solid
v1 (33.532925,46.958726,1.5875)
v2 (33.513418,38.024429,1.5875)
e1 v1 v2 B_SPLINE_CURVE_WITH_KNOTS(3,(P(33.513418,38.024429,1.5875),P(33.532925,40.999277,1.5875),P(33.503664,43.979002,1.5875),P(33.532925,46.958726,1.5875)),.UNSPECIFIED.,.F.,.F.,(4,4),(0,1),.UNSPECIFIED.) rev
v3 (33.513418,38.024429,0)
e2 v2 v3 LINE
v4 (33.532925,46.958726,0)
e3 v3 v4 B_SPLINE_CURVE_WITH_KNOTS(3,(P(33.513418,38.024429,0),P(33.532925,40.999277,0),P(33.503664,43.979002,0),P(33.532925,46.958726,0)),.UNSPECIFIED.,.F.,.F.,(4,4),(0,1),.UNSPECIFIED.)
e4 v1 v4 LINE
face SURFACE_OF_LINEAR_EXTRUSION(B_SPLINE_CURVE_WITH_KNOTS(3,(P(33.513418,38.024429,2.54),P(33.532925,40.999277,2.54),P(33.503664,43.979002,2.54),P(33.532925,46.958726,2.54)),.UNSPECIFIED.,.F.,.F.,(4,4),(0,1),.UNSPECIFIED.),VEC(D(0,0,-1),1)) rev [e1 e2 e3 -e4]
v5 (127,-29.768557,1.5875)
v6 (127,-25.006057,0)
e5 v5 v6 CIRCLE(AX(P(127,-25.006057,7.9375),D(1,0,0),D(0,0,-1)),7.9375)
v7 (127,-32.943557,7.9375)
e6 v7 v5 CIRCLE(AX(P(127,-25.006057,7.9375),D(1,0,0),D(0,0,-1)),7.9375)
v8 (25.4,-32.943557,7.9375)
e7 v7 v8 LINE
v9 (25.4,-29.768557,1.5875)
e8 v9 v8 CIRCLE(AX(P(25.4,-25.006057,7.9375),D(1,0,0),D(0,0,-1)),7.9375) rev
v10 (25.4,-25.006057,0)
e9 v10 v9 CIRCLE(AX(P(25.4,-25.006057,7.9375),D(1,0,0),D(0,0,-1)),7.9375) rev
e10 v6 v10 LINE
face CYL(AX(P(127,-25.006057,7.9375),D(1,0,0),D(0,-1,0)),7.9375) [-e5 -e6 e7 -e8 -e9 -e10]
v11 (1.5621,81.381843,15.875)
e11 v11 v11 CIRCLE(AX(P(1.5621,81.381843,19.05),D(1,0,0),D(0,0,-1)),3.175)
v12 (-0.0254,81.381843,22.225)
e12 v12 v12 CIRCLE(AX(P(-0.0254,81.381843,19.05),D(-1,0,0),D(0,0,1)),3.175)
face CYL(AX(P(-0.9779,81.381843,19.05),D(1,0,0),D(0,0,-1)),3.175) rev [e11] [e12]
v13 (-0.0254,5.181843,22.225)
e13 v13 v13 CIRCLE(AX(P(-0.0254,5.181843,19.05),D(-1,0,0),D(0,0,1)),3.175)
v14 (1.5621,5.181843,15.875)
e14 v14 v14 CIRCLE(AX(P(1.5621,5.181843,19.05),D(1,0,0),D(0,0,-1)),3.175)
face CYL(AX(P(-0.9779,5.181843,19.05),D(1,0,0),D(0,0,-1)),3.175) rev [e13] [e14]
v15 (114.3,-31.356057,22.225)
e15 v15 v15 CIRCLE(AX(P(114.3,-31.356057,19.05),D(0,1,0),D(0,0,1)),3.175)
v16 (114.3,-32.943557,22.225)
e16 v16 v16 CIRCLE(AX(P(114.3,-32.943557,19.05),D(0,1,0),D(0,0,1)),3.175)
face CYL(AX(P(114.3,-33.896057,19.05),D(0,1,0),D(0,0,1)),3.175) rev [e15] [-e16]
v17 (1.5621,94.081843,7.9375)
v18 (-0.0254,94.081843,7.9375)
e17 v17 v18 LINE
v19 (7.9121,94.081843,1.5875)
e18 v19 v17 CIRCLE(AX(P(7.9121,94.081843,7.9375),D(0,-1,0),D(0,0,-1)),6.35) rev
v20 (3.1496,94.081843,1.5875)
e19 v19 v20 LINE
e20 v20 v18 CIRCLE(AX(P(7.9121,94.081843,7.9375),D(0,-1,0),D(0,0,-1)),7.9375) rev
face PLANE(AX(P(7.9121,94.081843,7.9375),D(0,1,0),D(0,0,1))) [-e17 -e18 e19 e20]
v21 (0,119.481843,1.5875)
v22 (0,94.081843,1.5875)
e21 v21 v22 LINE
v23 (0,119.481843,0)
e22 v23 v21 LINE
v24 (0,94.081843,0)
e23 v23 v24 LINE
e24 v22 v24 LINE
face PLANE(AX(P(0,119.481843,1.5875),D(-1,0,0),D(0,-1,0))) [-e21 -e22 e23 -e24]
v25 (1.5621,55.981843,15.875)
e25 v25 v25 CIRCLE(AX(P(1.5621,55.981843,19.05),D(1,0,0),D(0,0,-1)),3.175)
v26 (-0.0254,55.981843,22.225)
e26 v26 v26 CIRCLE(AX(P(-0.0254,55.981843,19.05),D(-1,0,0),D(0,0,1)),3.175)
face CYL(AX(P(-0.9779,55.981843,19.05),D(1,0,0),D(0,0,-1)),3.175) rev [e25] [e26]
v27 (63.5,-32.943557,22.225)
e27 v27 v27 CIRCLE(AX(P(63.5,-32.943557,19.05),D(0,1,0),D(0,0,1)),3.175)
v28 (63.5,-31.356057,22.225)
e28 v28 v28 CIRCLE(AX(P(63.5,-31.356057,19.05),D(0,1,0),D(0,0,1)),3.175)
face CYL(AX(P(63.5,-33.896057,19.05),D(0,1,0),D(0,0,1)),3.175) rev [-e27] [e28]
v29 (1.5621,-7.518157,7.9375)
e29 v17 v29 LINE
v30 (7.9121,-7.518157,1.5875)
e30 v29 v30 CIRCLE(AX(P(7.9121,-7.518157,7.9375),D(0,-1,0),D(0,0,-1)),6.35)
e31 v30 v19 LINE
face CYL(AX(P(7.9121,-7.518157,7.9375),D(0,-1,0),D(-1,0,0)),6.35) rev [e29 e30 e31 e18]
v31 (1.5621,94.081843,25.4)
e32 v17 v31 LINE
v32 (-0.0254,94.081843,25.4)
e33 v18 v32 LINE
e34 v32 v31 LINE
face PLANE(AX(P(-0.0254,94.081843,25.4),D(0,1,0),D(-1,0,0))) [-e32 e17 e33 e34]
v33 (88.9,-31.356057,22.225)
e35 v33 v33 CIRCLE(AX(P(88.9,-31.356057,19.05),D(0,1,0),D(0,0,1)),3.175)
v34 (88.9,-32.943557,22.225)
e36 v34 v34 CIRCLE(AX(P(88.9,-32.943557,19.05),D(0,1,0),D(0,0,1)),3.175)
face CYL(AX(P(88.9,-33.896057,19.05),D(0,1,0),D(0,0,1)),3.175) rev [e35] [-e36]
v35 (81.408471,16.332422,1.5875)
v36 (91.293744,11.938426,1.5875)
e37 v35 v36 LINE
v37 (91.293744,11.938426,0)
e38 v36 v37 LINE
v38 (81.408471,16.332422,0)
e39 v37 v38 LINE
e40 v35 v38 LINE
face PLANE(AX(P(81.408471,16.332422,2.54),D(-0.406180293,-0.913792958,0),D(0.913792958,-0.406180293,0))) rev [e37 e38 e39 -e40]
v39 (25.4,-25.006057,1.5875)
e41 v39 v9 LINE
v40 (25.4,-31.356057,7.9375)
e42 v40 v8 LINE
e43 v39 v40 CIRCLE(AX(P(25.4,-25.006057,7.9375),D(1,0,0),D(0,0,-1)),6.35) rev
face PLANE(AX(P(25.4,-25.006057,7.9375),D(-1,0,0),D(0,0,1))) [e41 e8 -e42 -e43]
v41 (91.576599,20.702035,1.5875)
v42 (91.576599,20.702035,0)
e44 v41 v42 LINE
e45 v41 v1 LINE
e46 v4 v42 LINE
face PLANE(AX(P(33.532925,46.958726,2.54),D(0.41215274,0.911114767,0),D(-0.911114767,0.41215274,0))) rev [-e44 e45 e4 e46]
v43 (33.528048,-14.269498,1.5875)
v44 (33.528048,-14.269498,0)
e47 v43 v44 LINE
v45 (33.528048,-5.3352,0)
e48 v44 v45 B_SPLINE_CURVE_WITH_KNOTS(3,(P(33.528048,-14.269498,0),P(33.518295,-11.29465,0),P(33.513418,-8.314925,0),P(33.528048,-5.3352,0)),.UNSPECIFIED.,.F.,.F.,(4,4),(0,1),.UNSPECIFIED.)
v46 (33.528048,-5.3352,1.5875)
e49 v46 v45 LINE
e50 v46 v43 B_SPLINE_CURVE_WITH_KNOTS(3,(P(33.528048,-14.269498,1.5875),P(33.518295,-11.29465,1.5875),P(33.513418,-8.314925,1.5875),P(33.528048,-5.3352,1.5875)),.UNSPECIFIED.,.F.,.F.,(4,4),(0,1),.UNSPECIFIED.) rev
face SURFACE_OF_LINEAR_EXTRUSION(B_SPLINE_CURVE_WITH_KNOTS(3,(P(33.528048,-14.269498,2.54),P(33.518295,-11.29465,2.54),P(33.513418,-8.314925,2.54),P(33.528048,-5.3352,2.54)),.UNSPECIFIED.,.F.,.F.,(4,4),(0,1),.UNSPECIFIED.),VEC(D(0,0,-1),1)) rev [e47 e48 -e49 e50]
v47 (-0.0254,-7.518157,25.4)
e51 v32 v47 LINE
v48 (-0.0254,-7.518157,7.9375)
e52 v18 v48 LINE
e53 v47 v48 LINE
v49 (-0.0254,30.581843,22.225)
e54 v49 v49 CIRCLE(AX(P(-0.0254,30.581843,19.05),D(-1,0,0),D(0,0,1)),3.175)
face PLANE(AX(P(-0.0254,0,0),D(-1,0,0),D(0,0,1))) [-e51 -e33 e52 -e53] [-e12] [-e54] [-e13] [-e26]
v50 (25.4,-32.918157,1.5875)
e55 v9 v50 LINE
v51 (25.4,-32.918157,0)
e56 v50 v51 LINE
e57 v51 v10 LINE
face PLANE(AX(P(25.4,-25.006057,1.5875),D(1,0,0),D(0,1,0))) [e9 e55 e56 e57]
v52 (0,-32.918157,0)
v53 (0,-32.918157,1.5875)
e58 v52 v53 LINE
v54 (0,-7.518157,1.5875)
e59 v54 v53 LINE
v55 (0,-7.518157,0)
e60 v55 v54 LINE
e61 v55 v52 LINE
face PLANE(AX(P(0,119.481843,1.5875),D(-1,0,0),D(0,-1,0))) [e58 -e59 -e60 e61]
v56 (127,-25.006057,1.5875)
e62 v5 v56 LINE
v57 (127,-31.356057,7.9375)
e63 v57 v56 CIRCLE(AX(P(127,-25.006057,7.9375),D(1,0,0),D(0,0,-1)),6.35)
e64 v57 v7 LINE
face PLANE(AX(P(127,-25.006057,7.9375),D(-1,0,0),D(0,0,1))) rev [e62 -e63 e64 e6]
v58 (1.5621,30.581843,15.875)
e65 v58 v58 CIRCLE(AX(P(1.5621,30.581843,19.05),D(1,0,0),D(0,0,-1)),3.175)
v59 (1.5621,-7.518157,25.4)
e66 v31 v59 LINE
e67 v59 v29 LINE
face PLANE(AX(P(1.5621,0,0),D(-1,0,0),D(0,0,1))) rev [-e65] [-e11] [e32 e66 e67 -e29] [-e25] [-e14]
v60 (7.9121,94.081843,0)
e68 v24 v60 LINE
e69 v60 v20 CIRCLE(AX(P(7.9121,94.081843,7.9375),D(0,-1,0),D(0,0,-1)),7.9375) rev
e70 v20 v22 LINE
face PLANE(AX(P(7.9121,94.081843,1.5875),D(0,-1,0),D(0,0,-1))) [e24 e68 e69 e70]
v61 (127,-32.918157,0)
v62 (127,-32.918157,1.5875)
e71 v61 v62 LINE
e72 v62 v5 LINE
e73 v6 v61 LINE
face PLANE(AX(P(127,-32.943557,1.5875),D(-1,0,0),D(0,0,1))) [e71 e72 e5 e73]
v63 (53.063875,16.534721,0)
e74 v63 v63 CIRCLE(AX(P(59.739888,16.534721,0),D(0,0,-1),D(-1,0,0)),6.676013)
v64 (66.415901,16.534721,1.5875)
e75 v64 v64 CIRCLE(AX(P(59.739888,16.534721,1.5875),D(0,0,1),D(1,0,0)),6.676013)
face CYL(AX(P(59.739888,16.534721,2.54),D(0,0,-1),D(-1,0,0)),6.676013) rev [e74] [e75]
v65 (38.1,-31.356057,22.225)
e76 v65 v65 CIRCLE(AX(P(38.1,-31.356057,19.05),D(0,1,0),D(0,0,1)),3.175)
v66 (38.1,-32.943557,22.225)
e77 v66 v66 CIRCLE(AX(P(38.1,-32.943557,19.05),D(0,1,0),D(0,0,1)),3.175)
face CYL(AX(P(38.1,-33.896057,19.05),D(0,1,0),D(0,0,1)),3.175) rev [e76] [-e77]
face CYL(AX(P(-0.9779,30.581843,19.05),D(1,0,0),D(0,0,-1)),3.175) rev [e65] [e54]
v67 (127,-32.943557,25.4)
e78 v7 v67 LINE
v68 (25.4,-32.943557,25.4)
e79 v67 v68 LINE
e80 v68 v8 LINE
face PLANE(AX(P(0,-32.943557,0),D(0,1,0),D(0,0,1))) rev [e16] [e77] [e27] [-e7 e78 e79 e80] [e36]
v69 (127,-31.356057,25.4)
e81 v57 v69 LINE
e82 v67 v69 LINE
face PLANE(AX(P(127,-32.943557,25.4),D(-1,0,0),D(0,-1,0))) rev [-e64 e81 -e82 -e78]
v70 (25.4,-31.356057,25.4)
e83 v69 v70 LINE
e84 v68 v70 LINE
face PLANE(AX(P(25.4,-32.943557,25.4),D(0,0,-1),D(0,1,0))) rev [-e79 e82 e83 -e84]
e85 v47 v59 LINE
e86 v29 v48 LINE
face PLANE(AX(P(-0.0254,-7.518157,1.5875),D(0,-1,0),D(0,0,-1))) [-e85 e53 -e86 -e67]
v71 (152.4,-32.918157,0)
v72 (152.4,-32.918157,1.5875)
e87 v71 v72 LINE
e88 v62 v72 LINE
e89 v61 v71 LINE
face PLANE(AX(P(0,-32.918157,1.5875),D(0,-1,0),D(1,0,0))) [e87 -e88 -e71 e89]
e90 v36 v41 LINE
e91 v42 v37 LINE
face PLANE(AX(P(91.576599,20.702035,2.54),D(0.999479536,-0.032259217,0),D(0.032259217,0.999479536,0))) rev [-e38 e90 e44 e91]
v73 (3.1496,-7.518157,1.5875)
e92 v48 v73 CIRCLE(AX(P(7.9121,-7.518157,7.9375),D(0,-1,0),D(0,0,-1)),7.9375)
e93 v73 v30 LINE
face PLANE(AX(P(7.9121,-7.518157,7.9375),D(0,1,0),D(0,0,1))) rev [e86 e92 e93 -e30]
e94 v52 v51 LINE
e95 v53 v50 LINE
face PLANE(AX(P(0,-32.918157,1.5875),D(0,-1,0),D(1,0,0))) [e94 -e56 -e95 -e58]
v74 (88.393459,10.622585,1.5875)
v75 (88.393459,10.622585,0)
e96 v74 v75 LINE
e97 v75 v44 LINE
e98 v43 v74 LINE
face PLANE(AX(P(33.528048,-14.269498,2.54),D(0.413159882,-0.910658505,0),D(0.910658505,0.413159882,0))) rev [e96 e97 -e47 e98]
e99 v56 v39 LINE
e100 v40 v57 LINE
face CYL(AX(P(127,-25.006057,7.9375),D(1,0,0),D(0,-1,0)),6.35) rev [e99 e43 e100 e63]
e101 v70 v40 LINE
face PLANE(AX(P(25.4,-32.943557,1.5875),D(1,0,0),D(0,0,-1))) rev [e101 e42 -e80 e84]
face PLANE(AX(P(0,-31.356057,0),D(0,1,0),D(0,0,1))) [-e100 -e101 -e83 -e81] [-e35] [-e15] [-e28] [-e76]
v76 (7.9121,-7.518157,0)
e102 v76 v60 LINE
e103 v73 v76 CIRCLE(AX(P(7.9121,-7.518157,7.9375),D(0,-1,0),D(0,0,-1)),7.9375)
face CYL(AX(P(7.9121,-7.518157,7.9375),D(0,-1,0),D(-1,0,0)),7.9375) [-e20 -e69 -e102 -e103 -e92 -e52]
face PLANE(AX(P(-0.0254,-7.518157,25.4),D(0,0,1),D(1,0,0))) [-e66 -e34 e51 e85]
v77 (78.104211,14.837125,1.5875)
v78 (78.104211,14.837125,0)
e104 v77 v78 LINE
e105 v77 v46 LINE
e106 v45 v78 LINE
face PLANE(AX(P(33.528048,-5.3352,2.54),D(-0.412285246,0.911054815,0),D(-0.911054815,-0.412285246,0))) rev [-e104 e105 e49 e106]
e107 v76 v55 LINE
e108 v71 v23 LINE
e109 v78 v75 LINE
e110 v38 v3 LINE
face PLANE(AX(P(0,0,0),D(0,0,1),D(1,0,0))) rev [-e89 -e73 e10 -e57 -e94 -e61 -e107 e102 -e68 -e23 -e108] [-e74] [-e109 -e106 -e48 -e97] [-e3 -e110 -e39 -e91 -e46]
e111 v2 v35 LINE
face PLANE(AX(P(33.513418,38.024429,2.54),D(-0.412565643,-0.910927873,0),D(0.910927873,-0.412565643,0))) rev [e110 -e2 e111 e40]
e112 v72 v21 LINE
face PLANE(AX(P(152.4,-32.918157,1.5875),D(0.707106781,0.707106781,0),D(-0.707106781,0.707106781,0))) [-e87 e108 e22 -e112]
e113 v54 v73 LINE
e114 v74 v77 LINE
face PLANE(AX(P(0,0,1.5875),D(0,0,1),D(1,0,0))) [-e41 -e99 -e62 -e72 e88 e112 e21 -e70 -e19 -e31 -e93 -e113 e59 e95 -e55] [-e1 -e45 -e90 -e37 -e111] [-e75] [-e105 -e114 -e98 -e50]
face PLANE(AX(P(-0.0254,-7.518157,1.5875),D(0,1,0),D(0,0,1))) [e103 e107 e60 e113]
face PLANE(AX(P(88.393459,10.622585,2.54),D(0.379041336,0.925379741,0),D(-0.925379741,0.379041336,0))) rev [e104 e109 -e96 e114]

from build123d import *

# Parameters (mm, degrees)
BOSS_EXTRUDE1_DEPTH          = 1.5875
SKETCH7_W                    = 1.5875
SKETCH7_H                    = 101.6
BOSS_EXTRUDE2_DEPTH          = 0.0254
EDGE_FLANGE1_STRIP_W         = 19.05
EDGE_FLANGE1_STRIP_H         = 1.5875
EDGE_FLANGE1_STRIP_CUT_DEPTH = 101.6
EDGE_FLANGE1_DEPTH           = 101.6
SKETCH11_W                   = 101.6
SKETCH11_H                   = 1.5875
BOSS_EXTRUDE3_DEPTH          = 0.0254
EDGE_FLANGE2_STRIP_W         = 19.05
EDGE_FLANGE2_STRIP_H         = 1.5875
EDGE_FLANGE2_STRIP_CUT_DEPTH = 101.6
EDGE_FLANGE2_DEPTH           = 101.6
SKETCH15_R                   = 3.175
CUT_EXTRUDE1_DEPTH           = 2.54
SKETCH16_R                   = 3.175
CUT_EXTRUDE2_DEPTH           = 2.54
SKETCH18_R                   = 6.676012736
CUT_EXTRUDE5_DEPTH           = 2.54


# Sheet-metal steps are written as plain solids
with BuildPart() as part:
    # Sketch1 → Boss-Extrude1 (new body)
    with BuildSketch(Plane.XY):
        Polygon((0, 119.481843199), (0, -32.918156801), (152.4, -32.918156801), align=None)
    extrude(amount=BOSS_EXTRUDE1_DEPTH)

    # Sketch7 → Boss-Extrude2 (add)
    with BuildSketch(Plane.ZY):
        with Locations((0.79375, 43.281843199)):
            Rectangle(SKETCH7_W, SKETCH7_H)
    extrude(amount=BOSS_EXTRUDE2_DEPTH)

    # Edge-Flange1 strip (across the edge) → Edge-Flange1 strip cut (cut)
    with BuildSketch(Plane(origin=(-0.0254, 94.081843199, 1.5875), x_dir=(1, 0, 0), z_dir=(0, -1, 0))):
        with Locations((-1.5875, -0.79375)):
            Rectangle(EDGE_FLANGE1_STRIP_W, EDGE_FLANGE1_STRIP_H)
    extrude(amount=EDGE_FLANGE1_STRIP_CUT_DEPTH, mode=Mode.SUBTRACT)

    # Edge-Flange1 section (across the edge) → Edge-Flange1 (add)
    with BuildSketch(Plane(origin=(-0.0254, 94.081843199, 1.5875), x_dir=(1, 0, 0), z_dir=(0, -1, 0))):
        with BuildLine():
            Line((0, 6.35), (0, 23.8125))
            Line((0, 23.8125), (1.5875, 23.8125))
            Line((1.5875, 23.8125), (1.5875, 6.35))
            ThreePointArc((1.5875, 6.35), (3.447371939, 1.859871939), (7.9375, 0))
            Line((7.9375, 0), (7.9375, -1.5875))
            ThreePointArc((7.9375, -1.5875), (2.324839924, 0.737339924), (0, 6.35))
        make_face()
    extrude(amount=EDGE_FLANGE1_DEPTH)

    # Sketch11 → Boss-Extrude3 (add)
    with BuildSketch(Plane(origin=(0, -32.918156801, 0), x_dir=(-1, 0, 0), z_dir=(0, -1, 0))):
        with Locations((-76.2, -0.79375)):
            Rectangle(SKETCH11_W, SKETCH11_H)
    extrude(amount=BOSS_EXTRUDE3_DEPTH)

    # Edge-Flange2 strip (across the edge) → Edge-Flange2 strip cut (cut)
    with BuildSketch(Plane(origin=(25.4, -32.943556801, 1.5875), x_dir=(0, 1, 0), z_dir=(1, 0, 0))):
        with Locations((-1.5875, -0.79375)):
            Rectangle(EDGE_FLANGE2_STRIP_W, EDGE_FLANGE2_STRIP_H)
    extrude(amount=EDGE_FLANGE2_STRIP_CUT_DEPTH, mode=Mode.SUBTRACT)

    # Edge-Flange2 section (across the edge) → Edge-Flange2 (add)
    with BuildSketch(Plane(origin=(25.4, -32.943556801, 1.5875), x_dir=(0, 1, 0), z_dir=(1, 0, 0))):
        with BuildLine():
            Line((0, 6.35), (0, 23.8125))
            Line((0, 23.8125), (1.5875, 23.8125))
            Line((1.5875, 23.8125), (1.5875, 6.35))
            ThreePointArc((1.5875, 6.35), (3.447371939, 1.859871939), (7.9375, 0))
            Line((7.9375, 0), (7.9375, -1.5875))
            ThreePointArc((7.9375, -1.5875), (2.324839924, 0.737339924), (0, 6.35))
        make_face()
    extrude(amount=EDGE_FLANGE2_DEPTH)

    # Sketch15 → Cut-Extrude1 (cut)
    with BuildSketch(Plane(origin=(0, -31.356056801, 0), x_dir=(1, 0, 0), z_dir=(0, 1, 0))):
        with Locations(Location((38.1, -19.05, 0), (0, 0, 270))):
            Circle(SKETCH15_R)
        with Locations(Location((63.5, -19.05, 0), (0, 0, 270))):
            Circle(SKETCH15_R)
        with Locations(Location((88.9, -19.05, 0), (0, 0, 270))):
            Circle(SKETCH15_R)
        with Locations(Location((114.3, -19.05, 0), (0, 0, 270))):
            Circle(SKETCH15_R)
    extrude(amount=-CUT_EXTRUDE1_DEPTH, mode=Mode.SUBTRACT)

    # Sketch16 → Cut-Extrude2 (cut)
    with BuildSketch(Plane(origin=(1.5621, 0, 0), x_dir=(0, 0, -1), z_dir=(1, 0, 0))):
        with Locations((-19.05, 81.381843199)):
            Circle(SKETCH16_R)
        with Locations((-19.05, 55.981843199)):
            Circle(SKETCH16_R)
        with Locations((-19.05, 30.581843199)):
            Circle(SKETCH16_R)
        with Locations((-19.05, 5.181843199)):
            Circle(SKETCH16_R)
    extrude(amount=-CUT_EXTRUDE2_DEPTH, mode=Mode.SUBTRACT)

    # Sketch18 → Cut-Extrude5 (cut)
    with BuildSketch(Plane(origin=(0, 0, 0), x_dir=(-1, 0, 0), z_dir=(0, 0, -1))):
        with Locations((-59.739888133, 16.534721244)):
            Circle(SKETCH18_R)
        with BuildLine():
            Line((-88.393458916, 10.622584789), (-78.10421078, 14.837125247))
            Line((-78.10421078, 14.837125247), (-33.528048288, -5.335200069))
            add(Edge.make_bspline(
                [(-33.528048288, -5.335200069), (-33.513417888, -8.314924869), (-33.518294688, -11.294649669), (-33.528048288, -14.269497669)],
                knots=[0, 0, 0, 0, 1, 1, 1, 1], degree=3))
            Line((-33.528048288, -14.269497669), (-88.393458916, 10.622584789))
        make_face()
        with BuildLine():
            Line((-91.576598688, 20.702035131), (-91.293744288, 11.938425531))
            Line((-91.293744288, 11.938425531), (-81.408470688, 16.332422331))
            Line((-81.408470688, 16.332422331), (-33.513417888, 38.024428731))
            add(Edge.make_bspline(
                [(-33.532925088, 46.958726331), (-33.503664288, 43.979001531), (-33.532925088, 40.999276731), (-33.513417888, 38.024428731)],
                knots=[0, 0, 0, 0, 1, 1, 1, 1], degree=3))
            Line((-33.532925088, 46.958726331), (-91.576598688, 20.702035131))
        make_face()
    extrude(amount=-CUT_EXTRUDE5_DEPTH, mode=Mode.SUBTRACT)


solid = part.part
